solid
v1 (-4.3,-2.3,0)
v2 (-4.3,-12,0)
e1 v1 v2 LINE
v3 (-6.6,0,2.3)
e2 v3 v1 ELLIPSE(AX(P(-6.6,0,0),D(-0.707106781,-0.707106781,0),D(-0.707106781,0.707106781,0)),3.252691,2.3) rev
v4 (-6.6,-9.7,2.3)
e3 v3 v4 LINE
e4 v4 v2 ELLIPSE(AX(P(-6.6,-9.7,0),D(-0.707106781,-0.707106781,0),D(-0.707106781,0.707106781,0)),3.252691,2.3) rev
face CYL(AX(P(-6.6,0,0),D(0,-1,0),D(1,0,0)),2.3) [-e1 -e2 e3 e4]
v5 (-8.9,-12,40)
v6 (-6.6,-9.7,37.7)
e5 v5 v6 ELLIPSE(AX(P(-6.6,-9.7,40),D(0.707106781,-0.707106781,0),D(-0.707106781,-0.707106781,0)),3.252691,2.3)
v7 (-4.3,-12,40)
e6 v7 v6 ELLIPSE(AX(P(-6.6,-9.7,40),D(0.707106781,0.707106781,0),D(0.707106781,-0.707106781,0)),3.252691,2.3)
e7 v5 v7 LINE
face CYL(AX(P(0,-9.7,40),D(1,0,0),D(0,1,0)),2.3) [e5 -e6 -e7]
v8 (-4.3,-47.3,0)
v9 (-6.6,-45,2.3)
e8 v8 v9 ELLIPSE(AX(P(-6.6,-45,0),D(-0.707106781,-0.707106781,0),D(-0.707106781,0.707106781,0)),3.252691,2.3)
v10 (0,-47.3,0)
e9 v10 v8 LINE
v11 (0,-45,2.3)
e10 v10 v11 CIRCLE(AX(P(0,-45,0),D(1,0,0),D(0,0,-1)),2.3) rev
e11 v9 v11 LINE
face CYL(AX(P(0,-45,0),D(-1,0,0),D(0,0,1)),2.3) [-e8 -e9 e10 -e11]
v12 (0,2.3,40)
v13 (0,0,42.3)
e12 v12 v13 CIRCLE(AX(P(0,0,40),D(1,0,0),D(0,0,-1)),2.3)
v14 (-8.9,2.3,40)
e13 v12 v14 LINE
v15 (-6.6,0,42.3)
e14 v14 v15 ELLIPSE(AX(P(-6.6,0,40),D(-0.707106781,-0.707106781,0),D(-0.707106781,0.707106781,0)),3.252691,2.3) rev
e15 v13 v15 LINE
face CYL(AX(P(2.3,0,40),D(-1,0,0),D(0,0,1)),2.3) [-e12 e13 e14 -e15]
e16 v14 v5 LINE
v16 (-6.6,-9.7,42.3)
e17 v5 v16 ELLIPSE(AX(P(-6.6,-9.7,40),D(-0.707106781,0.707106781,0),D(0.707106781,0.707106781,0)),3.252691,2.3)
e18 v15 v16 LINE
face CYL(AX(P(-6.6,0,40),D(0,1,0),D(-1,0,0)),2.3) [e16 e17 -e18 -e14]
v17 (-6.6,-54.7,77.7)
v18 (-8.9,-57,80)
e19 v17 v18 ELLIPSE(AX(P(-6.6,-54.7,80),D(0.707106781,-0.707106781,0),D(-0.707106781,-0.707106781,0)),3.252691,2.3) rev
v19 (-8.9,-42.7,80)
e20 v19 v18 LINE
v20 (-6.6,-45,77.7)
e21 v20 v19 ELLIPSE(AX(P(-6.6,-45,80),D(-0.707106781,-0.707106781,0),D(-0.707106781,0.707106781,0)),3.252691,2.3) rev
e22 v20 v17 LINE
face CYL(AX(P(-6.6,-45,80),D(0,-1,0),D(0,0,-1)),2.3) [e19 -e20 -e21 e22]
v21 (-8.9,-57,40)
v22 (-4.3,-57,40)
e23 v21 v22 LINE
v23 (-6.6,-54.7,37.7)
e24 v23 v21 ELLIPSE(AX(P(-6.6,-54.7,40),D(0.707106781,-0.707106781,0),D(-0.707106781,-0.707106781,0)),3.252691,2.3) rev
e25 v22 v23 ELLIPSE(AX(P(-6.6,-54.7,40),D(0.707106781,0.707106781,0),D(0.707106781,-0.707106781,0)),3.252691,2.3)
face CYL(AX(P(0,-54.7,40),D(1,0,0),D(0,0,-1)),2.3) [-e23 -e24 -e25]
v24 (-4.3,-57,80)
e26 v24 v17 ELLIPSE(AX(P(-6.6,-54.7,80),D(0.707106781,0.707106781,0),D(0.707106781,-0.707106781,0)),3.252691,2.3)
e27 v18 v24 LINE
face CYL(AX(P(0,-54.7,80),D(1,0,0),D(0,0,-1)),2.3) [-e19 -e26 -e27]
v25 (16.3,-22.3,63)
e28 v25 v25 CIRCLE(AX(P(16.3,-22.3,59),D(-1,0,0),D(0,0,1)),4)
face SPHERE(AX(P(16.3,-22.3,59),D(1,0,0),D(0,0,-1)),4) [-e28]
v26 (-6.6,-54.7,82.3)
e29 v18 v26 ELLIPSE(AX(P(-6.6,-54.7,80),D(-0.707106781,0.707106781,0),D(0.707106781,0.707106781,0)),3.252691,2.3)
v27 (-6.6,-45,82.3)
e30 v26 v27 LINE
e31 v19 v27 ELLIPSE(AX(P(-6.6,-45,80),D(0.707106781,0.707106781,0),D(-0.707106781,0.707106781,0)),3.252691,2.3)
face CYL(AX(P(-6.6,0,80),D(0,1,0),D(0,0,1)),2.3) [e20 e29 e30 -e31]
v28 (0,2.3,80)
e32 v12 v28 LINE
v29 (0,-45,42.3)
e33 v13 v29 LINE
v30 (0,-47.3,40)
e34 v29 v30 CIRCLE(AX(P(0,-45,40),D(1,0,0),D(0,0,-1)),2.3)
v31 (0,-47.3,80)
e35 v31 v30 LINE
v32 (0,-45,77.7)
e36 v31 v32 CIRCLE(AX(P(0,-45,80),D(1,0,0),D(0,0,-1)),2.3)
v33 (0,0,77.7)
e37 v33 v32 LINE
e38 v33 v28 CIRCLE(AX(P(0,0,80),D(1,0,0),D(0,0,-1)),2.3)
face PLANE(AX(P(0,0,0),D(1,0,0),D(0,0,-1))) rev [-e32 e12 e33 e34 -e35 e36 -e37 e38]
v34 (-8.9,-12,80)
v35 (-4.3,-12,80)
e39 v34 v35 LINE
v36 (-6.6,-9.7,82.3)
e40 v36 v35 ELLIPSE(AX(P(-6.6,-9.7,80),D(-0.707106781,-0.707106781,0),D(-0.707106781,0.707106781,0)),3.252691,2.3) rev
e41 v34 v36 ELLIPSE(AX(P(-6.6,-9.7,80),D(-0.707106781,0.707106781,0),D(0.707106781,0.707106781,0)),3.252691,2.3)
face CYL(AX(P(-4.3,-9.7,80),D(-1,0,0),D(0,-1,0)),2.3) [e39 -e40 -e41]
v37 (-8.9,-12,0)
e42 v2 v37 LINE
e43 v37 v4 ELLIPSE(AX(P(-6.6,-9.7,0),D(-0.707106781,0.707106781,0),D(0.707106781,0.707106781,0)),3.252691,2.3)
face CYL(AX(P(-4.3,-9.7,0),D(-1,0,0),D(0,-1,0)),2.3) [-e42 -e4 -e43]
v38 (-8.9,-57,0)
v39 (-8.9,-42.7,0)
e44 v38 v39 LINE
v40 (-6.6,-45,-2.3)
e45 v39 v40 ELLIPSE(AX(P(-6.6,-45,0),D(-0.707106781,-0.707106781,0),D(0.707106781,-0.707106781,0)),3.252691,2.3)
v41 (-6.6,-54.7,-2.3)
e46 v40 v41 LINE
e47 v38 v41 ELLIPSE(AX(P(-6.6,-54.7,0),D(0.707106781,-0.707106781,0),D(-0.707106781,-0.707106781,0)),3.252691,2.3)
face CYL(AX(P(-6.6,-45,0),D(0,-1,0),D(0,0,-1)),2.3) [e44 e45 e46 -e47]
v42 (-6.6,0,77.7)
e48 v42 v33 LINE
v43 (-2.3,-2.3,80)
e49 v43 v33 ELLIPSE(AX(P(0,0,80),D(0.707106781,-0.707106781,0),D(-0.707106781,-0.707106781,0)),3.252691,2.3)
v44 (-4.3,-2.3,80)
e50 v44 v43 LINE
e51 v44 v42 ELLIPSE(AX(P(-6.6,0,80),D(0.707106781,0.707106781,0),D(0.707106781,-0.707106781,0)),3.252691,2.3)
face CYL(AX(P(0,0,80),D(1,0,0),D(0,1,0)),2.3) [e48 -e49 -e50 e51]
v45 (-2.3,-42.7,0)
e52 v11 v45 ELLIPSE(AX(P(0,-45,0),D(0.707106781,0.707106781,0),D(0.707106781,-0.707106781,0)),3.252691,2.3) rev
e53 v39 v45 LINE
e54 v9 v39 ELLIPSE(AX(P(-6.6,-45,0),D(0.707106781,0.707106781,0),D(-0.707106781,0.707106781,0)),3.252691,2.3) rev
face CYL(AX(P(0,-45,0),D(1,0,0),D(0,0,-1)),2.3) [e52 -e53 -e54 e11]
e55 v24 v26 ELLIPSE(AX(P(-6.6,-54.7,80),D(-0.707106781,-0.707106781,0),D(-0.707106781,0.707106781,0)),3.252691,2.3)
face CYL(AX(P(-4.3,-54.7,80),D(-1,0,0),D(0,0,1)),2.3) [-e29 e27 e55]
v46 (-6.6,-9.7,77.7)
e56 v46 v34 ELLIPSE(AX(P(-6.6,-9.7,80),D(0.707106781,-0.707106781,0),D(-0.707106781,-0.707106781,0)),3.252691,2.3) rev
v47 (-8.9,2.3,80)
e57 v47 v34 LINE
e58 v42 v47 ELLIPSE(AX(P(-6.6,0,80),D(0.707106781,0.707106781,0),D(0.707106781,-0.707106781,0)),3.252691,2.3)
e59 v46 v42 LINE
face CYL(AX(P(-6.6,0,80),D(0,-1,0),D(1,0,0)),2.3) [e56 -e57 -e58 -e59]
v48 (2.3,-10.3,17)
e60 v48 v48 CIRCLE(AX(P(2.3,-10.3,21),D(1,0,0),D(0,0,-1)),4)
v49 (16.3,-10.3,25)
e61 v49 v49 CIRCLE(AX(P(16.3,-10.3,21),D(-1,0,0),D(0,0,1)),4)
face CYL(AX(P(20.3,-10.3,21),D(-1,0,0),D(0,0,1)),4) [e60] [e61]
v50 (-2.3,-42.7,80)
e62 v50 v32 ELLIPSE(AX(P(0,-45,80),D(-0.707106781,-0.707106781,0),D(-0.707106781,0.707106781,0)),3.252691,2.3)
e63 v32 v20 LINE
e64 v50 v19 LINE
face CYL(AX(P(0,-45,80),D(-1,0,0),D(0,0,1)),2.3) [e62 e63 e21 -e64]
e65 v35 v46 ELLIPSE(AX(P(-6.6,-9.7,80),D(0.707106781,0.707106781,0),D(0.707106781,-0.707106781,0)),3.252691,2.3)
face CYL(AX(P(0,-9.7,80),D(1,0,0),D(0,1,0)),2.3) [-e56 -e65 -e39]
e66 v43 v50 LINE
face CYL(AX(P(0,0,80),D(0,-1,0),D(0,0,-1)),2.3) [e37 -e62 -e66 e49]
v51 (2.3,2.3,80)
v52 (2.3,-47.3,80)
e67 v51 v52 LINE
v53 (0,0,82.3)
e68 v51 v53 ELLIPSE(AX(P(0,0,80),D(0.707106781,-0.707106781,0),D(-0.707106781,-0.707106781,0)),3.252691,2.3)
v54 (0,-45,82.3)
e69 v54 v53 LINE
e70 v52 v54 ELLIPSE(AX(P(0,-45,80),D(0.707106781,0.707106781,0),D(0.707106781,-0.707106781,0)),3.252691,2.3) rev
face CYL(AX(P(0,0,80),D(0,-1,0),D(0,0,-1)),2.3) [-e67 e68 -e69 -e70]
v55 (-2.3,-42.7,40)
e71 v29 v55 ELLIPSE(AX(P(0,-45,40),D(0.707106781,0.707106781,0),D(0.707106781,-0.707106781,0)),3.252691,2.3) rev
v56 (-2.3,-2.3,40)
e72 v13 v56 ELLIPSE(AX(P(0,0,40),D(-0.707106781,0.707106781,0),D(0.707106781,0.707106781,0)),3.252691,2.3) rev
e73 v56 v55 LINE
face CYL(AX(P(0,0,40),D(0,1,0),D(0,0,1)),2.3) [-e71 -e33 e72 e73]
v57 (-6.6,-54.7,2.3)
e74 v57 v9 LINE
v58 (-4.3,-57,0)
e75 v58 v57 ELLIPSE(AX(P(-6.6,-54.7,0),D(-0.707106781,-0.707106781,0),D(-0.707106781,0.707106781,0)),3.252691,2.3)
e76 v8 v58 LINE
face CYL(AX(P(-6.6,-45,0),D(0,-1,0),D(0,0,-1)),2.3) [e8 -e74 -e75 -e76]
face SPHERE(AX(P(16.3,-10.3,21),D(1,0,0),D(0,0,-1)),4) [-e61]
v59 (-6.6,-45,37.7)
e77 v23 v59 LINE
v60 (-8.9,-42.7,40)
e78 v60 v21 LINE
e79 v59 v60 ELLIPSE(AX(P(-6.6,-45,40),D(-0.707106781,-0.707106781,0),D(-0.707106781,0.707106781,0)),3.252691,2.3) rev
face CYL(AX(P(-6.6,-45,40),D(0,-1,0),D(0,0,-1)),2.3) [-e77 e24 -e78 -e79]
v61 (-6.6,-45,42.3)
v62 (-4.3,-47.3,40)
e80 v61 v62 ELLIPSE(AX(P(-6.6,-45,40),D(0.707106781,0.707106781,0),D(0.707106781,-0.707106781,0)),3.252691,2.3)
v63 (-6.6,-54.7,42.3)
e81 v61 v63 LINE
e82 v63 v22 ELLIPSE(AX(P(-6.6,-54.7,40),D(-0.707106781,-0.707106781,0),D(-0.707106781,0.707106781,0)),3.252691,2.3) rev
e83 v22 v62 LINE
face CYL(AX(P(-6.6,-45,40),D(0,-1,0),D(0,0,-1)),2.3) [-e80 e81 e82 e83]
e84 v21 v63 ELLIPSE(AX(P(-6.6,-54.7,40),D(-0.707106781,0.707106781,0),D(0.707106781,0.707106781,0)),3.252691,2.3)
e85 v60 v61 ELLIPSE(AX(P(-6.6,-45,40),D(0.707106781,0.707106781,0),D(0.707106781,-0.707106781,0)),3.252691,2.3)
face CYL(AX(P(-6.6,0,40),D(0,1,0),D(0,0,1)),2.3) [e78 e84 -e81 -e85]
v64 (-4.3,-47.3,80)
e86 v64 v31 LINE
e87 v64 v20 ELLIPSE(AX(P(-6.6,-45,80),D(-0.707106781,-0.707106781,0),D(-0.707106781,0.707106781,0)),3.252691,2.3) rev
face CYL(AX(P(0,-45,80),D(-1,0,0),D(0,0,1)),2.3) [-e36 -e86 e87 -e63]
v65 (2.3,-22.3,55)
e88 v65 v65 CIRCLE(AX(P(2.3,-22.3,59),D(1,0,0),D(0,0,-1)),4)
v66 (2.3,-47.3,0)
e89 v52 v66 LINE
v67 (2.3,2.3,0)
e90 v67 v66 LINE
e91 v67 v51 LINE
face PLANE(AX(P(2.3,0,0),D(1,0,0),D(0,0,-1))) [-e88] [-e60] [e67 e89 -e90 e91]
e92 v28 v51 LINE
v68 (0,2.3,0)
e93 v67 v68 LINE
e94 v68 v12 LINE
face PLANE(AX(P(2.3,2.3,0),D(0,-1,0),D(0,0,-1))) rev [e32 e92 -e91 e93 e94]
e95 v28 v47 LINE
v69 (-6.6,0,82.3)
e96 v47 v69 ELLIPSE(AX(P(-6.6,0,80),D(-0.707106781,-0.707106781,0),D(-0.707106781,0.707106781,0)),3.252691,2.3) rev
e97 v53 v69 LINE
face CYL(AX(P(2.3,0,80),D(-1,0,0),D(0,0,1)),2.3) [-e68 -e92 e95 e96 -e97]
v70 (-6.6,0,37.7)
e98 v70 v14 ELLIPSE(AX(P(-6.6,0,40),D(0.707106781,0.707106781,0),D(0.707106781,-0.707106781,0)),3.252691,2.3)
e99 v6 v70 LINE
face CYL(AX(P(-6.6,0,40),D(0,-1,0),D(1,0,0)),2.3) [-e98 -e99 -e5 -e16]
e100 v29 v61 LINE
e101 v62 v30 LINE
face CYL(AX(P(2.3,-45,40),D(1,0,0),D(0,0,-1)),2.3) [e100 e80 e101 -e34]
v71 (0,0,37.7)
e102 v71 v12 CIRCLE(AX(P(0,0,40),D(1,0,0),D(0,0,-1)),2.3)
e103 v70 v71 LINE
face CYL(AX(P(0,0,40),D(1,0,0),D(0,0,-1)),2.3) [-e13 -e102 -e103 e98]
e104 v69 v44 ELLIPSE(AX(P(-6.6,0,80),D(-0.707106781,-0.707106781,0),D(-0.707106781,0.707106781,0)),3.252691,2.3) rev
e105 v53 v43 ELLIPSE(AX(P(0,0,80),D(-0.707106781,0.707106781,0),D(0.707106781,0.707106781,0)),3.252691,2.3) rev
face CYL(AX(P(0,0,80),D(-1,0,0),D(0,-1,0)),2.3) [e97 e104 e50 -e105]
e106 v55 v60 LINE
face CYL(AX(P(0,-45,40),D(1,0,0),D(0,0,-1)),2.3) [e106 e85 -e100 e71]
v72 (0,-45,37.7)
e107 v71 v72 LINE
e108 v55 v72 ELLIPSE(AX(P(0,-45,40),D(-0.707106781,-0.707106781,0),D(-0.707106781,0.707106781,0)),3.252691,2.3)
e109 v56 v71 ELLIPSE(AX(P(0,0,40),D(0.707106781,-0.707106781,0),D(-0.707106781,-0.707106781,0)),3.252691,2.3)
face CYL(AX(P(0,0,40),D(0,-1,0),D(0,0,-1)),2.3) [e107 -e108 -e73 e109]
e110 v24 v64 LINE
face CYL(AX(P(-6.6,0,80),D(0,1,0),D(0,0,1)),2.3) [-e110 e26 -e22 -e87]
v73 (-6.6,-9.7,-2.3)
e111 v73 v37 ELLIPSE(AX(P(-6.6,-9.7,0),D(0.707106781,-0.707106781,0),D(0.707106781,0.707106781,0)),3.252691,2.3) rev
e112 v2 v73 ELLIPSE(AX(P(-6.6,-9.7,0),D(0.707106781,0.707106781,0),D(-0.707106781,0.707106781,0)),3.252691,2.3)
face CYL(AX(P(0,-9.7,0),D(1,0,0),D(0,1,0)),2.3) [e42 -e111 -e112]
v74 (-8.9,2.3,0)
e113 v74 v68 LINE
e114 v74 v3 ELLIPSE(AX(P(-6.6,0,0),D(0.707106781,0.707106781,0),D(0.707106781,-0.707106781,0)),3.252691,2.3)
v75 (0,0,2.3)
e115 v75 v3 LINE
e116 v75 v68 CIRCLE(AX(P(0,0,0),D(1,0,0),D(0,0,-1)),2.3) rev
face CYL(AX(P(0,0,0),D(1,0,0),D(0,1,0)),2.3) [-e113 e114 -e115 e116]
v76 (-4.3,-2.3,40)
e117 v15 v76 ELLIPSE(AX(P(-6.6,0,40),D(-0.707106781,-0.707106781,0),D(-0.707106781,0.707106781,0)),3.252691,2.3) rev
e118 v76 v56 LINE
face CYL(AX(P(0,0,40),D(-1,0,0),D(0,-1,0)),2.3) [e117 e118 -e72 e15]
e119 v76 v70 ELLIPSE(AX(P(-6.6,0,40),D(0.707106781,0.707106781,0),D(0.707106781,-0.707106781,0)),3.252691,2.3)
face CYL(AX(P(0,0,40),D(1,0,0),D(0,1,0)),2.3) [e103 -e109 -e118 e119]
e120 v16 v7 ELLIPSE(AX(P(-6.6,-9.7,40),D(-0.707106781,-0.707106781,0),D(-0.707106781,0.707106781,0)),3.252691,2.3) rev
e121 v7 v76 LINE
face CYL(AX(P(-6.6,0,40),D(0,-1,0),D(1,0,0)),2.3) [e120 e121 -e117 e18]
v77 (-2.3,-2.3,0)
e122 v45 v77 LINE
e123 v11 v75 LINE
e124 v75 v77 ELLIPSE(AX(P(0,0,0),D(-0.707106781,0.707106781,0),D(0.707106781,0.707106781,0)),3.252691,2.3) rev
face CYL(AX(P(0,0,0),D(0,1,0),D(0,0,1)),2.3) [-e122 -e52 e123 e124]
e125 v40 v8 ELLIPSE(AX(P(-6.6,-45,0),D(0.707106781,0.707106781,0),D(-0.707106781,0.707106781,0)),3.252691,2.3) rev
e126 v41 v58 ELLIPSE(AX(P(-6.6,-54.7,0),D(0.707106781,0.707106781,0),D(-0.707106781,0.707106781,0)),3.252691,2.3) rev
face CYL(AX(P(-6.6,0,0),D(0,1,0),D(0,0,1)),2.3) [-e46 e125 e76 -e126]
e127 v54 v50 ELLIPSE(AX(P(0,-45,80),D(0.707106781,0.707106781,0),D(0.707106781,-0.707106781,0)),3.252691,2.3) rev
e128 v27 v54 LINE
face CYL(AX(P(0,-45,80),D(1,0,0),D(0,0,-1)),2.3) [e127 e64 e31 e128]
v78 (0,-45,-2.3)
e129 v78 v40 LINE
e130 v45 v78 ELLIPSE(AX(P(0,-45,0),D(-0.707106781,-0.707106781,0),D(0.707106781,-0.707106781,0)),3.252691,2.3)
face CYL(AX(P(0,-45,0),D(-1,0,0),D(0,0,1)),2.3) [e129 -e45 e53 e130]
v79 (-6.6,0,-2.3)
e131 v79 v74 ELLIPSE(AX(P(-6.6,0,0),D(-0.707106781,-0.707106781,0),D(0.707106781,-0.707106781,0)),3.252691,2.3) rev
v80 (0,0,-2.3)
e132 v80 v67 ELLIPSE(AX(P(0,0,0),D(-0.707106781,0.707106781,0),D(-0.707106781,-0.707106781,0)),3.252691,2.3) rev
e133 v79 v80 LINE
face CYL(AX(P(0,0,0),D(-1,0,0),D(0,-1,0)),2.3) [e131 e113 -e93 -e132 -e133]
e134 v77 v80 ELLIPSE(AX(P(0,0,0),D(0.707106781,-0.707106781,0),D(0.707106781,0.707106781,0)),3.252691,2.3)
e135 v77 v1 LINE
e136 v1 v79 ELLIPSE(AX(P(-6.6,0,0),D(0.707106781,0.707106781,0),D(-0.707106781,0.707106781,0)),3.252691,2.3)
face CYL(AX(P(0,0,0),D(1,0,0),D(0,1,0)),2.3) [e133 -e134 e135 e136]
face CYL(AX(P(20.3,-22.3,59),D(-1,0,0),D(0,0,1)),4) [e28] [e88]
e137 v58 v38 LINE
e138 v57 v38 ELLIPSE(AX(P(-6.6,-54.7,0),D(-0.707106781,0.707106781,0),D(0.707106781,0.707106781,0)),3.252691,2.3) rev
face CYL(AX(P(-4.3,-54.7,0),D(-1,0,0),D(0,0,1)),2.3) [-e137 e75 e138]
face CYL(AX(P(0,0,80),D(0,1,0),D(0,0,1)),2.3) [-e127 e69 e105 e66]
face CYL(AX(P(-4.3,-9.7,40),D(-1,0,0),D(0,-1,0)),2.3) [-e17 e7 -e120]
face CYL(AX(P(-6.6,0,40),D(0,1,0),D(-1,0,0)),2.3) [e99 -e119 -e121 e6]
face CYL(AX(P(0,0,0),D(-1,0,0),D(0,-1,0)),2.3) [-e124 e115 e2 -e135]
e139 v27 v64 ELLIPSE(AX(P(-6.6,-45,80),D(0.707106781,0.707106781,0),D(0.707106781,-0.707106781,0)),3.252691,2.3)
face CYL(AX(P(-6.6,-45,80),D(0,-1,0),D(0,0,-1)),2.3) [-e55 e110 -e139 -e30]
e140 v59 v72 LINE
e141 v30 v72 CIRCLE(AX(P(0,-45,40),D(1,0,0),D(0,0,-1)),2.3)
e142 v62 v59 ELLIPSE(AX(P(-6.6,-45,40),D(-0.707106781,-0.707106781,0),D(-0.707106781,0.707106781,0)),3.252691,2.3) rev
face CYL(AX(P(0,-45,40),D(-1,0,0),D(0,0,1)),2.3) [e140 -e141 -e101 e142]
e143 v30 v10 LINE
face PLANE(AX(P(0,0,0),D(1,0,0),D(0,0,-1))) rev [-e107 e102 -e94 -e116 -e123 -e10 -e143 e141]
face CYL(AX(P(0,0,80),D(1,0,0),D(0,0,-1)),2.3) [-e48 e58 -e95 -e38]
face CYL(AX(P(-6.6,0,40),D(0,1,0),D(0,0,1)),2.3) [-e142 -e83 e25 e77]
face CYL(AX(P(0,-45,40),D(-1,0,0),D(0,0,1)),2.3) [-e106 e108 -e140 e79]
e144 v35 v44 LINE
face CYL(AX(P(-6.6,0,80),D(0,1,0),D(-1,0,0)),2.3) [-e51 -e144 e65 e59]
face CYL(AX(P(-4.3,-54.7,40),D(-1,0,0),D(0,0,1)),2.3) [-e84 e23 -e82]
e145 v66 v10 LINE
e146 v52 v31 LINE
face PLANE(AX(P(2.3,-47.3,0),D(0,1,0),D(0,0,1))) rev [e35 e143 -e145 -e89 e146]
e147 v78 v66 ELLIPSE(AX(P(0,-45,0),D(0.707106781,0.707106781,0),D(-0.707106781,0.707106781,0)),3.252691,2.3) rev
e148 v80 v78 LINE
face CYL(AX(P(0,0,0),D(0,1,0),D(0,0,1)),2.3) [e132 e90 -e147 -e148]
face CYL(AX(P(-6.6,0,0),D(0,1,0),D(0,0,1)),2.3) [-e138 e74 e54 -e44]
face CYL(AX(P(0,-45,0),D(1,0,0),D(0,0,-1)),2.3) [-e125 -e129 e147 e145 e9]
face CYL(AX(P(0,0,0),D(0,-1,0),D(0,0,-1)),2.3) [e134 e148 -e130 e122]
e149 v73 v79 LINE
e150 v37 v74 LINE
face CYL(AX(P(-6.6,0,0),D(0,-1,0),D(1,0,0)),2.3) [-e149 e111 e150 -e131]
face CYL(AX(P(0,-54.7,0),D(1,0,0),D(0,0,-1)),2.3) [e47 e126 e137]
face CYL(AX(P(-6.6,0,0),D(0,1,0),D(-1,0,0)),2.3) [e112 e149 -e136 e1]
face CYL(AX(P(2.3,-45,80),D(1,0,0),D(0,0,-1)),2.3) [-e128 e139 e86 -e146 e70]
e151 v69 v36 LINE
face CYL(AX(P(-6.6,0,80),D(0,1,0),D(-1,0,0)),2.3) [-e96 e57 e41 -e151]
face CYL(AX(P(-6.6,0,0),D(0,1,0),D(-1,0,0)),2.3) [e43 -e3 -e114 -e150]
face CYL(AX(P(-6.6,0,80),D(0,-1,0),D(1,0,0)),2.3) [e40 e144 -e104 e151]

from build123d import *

# Parameters (mm, degrees)
EXTRU_MINCE1_DEPTH           = 2.3
CONG_1_R                     = 2.3
ESQUISSE2_W                  = 80
ESQUISSE2_H                  = 49.6
BOSS_EXTRU_1_DEPTH           = 2.3
R_P_TITION_START             = 77.7
R_P_TITION_LIN_AIRE1_DEPTH   = 4.6
R_P_TITION_START_2           = 37.7
R_P_TITION_LIN_AIRE1_2_DEPTH = 4.6
CONG_2_R                     = 2.3
ESQUISSE3_R                  = 4
BOSS_EXTRU_2_DEPTH           = 18
CONG_3_R                     = 4


# Read off the part's stored shape, not the designer's step: Répétition linéaire1
with BuildPart() as part:
    # Esquisse1 → Extru.-Mince1 (new, symmetric)
    with BuildSketch(Plane.XY):
        Polygon((-4.3, -57), (-4.3, -47.3), (2.3, -47.3), (2.3, 2.3), (-8.9, 2.3), (-8.9, -12), (-4.3, -12), (-4.3, -2.3), (-2.3, -2.3), (-2.3, -42.7), (-8.9, -42.7), (-8.9, -57), align=None)
    extrude(amount=EXTRU_MINCE1_DEPTH, both=True)

    # Congé1
    cong_1_edges = [part.edges().sort_by_distance(p)[0] for p in [
        (-6.6, -57, -2.3),
        (-4.3, -52.15, -2.3),
        (-1, -47.3, -2.3),
        (2.3, -22.5, -2.3),
        (-3.3, 2.3, -2.3),
        (-8.9, -4.85, -2.3),
        (-6.6, -12, -2.3),
        (-4.3, -7.15, -2.3),
        (-3.3, -2.3, -2.3),
        (-2.3, -22.5, -2.3),
        (-5.6, -42.7, -2.3),
        (-8.9, -49.85, -2.3),
        (-5.6, -42.7, 2.3),
        (-2.3, -22.5, 2.3),
        (-3.3, -2.3, 2.3),
        (-4.3, -7.15, 2.3),
        (-6.6, -12, 2.3),
        (-8.9, -4.85, 2.3),
        (-3.3, 2.3, 2.3),
        (2.3, -22.5, 2.3),
        (-1, -47.3, 2.3),
        (-4.3, -52.15, 2.3),
        (-6.6, -57, 2.3),
        (-8.9, -49.85, 2.3),
    ]]
    fillet(cong_1_edges, radius=CONG_1_R - 0.0001)  # a hair under: the kernel refuses the full size

    # Esquisse2 → Boss.-Extru.1 (add)
    with BuildSketch(Plane(origin=(0, 0, 0), x_dir=(0, 0, -1), z_dir=(1, 0, 0))):
        with Locations((-40, -22.5)):
            Rectangle(ESQUISSE2_W, ESQUISSE2_H)
    extrude(amount=BOSS_EXTRU_1_DEPTH)

    # Répétition linéaire1 outline → Répétition linéaire1 (add)
    with BuildSketch(Plane.XY.offset(R_P_TITION_START)):
        Polygon((-8.9, 2.3), (-8.9, -12), (-4.3, -12), (-4.3, -2.3), (-2.3, -2.3), (-2.3, -42.7), (-8.9, -42.7), (-8.9, -57), (-4.3, -57), (-4.3, -47.3), (2.3, -47.3), (2.3, 2.3), align=None)
    extrude(amount=R_P_TITION_LIN_AIRE1_DEPTH)

    # R_p_tition lin_aire1 2 outline → R_p_tition lin_aire1 2 (add)
    with BuildSketch(Plane.XY.offset(R_P_TITION_START_2)):
        Polygon((0, 2.3), (-8.9, 2.3), (-8.9, -12), (-4.3, -12), (-4.3, -2.3), (-2.3, -2.3), (-2.3, -42.7), (-8.9, -42.7), (-8.9, -57), (-4.3, -57), (-4.3, -47.3), (0, -47.3), align=None)
    extrude(amount=R_P_TITION_LIN_AIRE1_2_DEPTH)

    # Congé2
    cong_2_edges = [part.edges().sort_by_distance(p)[0] for p in [
        (-5.6, -42.7, 42.3),
        (-2.3, -22.5, 42.3),
        (-3.3, -2.3, 42.3),
        (-4.3, -7.15, 42.3),
        (-6.6, -12, 42.3),
        (-8.9, -4.85, 42.3),
        (-4.45, 2.3, 42.3),
        (-2.15, -47.3, 42.3),
        (-4.3, -52.15, 42.3),
        (-6.6, -57, 42.3),
        (-8.9, -49.85, 42.3),
        (-2.15, -47.3, 37.7),
        (-4.3, -52.15, 37.7),
        (-6.6, -57, 37.7),
        (-8.9, -49.85, 37.7),
        (-5.6, -42.7, 37.7),
        (-2.3, -22.5, 37.7),
        (-3.3, -2.3, 37.7),
        (-4.3, -7.15, 37.7),
        (-6.6, -12, 37.7),
        (-8.9, -4.85, 37.7),
        (-4.45, 2.3, 37.7),
        (-5.6, -42.7, 82.3),
        (-2.3, -22.5, 82.3),
        (-3.3, -2.3, 82.3),
        (-4.3, -7.15, 82.3),
        (-6.6, -12, 82.3),
        (-8.9, -4.85, 82.3),
        (-3.3, 2.3, 82.3),
        (2.3, -22.5, 82.3),
        (-1, -47.3, 82.3),
        (-4.3, -52.15, 82.3),
        (-6.6, -57, 82.3),
        (-8.9, -49.85, 82.3),
        (-2.15, -47.3, 77.7),
        (-4.3, -52.15, 77.7),
        (-6.6, -57, 77.7),
        (-8.9, -49.85, 77.7),
        (-5.6, -42.7, 77.7),
        (-2.3, -22.5, 77.7),
        (-3.3, -2.3, 77.7),
        (-4.3, -7.15, 77.7),
        (-6.6, -12, 77.7),
        (-8.9, -4.85, 77.7),
        (-4.45, 2.3, 77.7),
    ]]
    fillet(cong_2_edges, radius=CONG_2_R - 0.0001)  # a hair under: the kernel refuses the full size

    # Esquisse3 → Boss.-Extru.2 (add)
    with BuildSketch(Plane(origin=(2.3, 0, 0), x_dir=(0, 0, -1), z_dir=(1, 0, 0))):
        with Locations((-59, -22.3)):
            Circle(ESQUISSE3_R)
        with Locations((-21, -10.3)):
            Circle(ESQUISSE3_R)
    extrude(amount=BOSS_EXTRU_2_DEPTH)

    # Congé3
    cong_3_edges = [part.edges().sort_by_distance(p)[0] for p in [
        (20.3, -22.3, 63),
        (20.3, -10.3, 25),
    ]]
    fillet(cong_3_edges, radius=CONG_3_R)


solid = part.part
